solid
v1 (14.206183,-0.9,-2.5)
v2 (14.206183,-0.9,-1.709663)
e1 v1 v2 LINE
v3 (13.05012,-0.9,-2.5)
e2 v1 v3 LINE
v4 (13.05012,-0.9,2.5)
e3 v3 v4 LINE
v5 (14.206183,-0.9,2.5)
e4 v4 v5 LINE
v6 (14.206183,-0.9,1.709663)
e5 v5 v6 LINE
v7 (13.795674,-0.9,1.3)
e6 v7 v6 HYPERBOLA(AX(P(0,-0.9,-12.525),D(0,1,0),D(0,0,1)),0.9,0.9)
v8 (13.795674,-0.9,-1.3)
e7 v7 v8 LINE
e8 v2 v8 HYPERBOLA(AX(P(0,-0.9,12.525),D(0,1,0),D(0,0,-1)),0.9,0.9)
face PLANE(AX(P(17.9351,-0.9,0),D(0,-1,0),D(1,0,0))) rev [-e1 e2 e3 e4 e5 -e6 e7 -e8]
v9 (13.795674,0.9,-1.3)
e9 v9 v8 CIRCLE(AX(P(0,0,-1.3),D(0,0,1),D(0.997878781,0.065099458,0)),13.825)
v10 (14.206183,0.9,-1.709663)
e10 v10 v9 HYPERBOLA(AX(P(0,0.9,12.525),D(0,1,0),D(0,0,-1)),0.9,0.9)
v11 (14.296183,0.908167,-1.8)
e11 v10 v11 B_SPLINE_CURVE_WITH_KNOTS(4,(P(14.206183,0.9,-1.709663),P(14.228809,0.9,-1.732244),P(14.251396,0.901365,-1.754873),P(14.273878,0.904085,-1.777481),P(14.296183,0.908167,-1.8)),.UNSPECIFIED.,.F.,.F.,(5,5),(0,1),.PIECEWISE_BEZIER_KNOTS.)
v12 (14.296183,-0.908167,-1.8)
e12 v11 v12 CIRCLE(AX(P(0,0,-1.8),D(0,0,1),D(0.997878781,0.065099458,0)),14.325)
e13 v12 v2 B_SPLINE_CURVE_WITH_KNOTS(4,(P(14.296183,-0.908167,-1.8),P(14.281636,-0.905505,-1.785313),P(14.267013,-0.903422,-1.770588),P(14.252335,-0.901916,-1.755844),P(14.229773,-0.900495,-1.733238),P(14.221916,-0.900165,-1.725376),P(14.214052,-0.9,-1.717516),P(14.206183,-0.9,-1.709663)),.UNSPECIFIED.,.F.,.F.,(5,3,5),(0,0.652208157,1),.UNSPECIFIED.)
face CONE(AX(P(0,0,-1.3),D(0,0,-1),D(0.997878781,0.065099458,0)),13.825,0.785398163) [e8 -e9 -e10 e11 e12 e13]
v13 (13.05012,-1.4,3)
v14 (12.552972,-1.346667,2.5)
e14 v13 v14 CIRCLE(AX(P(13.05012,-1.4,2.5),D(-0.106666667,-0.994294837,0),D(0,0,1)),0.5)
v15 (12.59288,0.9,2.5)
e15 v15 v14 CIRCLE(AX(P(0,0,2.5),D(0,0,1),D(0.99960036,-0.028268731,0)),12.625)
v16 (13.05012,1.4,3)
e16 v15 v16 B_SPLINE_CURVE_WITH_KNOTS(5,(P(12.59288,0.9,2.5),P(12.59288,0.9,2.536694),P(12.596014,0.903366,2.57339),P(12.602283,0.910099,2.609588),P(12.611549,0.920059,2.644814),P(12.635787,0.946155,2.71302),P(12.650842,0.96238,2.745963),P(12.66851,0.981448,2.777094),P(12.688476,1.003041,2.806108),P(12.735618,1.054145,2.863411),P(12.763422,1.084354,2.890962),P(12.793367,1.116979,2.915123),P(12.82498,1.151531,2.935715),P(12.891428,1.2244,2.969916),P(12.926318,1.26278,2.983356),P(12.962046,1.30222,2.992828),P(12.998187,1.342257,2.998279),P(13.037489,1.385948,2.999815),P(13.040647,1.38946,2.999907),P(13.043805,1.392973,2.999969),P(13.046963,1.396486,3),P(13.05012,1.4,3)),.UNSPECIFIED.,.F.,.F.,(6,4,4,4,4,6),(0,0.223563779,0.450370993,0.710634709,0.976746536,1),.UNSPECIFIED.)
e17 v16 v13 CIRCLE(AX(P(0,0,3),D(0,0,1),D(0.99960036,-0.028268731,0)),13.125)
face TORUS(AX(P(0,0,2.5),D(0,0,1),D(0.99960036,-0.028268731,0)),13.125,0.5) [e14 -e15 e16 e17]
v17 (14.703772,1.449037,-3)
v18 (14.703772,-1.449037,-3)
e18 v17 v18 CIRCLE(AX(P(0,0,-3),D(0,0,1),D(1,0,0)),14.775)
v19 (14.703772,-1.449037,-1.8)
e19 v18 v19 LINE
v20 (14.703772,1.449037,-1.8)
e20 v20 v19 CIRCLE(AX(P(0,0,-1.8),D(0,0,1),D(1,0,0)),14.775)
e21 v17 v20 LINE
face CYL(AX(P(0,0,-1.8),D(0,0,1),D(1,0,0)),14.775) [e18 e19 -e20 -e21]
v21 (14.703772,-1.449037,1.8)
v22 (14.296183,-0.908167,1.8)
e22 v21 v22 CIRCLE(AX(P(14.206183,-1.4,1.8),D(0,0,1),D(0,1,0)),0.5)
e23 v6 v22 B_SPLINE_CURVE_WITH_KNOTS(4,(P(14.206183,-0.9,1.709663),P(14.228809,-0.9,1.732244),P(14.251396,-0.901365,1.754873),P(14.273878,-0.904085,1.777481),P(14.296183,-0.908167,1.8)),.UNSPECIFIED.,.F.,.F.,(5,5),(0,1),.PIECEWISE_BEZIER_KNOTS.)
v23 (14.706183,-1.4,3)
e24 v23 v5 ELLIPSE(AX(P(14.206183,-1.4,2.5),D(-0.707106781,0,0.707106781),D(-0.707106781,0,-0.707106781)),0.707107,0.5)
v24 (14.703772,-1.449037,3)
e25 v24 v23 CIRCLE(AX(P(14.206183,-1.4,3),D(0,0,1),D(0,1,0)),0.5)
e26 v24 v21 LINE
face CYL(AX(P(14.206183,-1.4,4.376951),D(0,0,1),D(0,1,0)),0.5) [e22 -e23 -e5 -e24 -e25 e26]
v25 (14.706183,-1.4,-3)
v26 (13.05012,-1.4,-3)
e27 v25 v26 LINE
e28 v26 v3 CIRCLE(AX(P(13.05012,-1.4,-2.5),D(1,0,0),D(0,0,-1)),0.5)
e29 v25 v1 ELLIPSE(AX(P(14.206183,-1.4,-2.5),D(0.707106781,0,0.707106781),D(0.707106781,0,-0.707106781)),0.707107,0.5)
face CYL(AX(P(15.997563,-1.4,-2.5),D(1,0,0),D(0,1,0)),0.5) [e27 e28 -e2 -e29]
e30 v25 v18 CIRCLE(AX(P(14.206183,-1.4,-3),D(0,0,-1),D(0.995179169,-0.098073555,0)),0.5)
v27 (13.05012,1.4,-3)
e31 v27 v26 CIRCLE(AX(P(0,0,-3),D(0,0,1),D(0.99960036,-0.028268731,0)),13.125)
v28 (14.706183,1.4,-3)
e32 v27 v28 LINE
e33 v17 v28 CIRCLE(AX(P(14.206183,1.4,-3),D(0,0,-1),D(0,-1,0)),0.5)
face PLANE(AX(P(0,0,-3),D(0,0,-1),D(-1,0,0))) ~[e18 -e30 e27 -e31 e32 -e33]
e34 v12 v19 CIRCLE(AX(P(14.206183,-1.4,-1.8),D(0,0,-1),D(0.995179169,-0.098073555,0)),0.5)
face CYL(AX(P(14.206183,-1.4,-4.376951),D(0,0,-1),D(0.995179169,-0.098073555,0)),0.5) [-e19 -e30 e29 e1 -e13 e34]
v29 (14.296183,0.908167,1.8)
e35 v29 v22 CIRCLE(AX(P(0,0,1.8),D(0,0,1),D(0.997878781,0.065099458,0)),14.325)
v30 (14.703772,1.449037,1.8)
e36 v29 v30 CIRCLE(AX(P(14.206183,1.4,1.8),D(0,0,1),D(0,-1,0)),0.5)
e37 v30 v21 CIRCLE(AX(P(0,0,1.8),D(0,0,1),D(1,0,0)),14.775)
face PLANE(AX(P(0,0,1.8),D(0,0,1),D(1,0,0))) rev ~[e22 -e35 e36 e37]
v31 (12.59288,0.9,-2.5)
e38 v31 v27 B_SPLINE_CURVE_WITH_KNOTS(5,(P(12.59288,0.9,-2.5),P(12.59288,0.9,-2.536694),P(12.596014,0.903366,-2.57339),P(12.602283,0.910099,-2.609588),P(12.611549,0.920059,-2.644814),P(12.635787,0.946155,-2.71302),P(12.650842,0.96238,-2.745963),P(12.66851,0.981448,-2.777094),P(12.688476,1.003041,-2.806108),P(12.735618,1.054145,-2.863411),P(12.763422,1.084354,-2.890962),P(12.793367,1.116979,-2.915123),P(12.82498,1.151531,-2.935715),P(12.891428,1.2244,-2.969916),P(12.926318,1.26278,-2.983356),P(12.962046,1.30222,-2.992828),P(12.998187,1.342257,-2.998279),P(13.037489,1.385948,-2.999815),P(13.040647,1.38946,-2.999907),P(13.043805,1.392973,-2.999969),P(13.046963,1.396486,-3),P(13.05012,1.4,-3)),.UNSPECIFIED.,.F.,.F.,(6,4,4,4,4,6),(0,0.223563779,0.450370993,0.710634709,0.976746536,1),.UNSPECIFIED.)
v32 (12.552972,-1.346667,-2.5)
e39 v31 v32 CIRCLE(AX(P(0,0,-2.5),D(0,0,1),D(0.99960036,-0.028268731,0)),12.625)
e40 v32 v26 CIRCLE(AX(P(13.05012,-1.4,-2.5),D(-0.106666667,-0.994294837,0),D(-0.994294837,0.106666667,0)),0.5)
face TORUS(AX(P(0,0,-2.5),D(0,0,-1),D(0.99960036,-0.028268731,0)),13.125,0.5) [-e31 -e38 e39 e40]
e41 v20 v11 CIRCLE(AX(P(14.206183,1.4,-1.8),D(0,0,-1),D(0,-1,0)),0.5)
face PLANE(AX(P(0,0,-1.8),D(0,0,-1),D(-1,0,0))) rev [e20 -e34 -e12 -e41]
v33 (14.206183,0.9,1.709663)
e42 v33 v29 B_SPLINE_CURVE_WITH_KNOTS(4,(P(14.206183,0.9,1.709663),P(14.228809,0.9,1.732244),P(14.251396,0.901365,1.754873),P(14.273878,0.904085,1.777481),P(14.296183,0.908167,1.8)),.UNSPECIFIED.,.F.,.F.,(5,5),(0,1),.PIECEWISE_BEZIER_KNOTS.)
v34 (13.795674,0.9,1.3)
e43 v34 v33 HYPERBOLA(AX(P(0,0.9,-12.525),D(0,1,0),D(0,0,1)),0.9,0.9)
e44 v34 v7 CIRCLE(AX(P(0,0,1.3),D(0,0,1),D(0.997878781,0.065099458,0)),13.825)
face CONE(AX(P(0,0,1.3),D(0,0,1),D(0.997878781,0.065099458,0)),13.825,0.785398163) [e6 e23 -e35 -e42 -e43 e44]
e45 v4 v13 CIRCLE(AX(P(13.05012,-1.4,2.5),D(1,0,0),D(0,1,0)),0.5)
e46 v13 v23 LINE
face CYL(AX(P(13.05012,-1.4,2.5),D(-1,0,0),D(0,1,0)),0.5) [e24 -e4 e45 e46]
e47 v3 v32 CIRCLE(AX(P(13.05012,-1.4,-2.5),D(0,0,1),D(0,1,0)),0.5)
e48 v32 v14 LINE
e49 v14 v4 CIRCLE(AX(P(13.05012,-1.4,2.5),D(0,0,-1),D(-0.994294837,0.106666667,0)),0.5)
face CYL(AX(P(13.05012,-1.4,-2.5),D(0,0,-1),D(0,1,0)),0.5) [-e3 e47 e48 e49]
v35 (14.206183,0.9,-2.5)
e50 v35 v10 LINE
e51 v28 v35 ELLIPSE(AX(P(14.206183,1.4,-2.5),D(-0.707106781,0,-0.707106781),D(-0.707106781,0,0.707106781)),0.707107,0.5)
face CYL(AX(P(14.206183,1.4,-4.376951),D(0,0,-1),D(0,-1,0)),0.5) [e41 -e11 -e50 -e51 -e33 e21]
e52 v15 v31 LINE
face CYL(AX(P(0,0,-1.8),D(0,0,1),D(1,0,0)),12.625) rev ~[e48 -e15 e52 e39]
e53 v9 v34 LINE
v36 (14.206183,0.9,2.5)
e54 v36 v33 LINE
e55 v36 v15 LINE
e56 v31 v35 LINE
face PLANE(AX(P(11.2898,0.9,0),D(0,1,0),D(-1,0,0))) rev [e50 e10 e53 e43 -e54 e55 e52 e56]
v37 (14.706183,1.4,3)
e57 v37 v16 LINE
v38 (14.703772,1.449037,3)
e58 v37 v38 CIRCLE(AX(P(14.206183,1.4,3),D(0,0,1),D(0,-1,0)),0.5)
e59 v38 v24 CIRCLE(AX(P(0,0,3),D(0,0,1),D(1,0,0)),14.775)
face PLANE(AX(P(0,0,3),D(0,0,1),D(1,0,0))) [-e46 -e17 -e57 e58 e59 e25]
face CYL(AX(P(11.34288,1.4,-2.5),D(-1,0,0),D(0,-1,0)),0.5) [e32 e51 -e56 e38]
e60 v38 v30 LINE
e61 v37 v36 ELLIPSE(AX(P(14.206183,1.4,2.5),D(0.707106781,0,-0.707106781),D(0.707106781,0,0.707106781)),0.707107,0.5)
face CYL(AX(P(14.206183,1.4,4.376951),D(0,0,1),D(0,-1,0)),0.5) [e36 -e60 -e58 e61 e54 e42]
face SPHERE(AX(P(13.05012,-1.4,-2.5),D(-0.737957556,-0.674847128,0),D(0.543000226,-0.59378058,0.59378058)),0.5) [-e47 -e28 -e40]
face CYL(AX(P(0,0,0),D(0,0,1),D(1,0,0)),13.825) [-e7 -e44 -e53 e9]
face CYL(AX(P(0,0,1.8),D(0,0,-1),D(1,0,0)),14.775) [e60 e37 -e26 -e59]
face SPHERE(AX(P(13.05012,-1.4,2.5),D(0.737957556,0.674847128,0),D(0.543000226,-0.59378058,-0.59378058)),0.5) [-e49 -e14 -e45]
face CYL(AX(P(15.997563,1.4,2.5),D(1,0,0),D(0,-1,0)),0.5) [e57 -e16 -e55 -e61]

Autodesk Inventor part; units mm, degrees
ref_plane "YZ Plane" through (0, 0, 0) normal (1, 0, 0) x (0, 1, 0)
ref_plane "XZ Plane" through (0, 0, 0) normal (0, 1, 0) x (-1, 0, 0)
ref_plane "XY Plane" through (0, 0, 0) normal (0, 0, 1) x (1, 0, 0)
sketch "Sketch1" plane through (0, 0, 0) normal (0, 0, 1) x (1, 0, 0)
  circle A0 centre (0, 0) radius 13.825
  circle A1 centre (0, 0) radius 12.625
  dimension "d0" = 27.65
  dimension "d1" = 25.25
extrude "Extrusion1" add sketch "Sketch1" along normal blind 1.8
sketch "Sketch2" plane through (0, 0, 1.8) normal (0, 0, 1) x (1, 0, 0)
  circle A0 centre (0, 0) radius 12.625
  circle A1 centre (0, 0) radius 14.775
  dimension "d5" = 29.55
  dimension "d16" = 25.25
extrude "Extrusion2" add sketch "Sketch2" along normal blind 1.2
sketch "Sketch3" plane through (0, 0, 0) normal (0, 0, 1) x (1, 0, 0)
  line L0 (11.2898, 0.9) -> (17.9351, 0.9)
  line L1 (17.9351, 0.9) -> (17.9351, -0.9)
  line L2 (17.9351, -0.9) -> (11.2898, -0.9)
  line L3 (11.2898, -0.9) -> (11.2898, 0.9)
  point P0 (0, 0)
  dimension "d13" = 1.8
  dimension "d14" = 6.6453
  dimension "d15" = 0.9
extrude "Extrusion3" cut sketch "Sketch3" along normal blind 6
chamfer "Chamfer1" distance 0.5 angle 45 1 edges at (-13.825, 0, 1.8)
mirror "Mirror2" about plane through (0, 0, 0) normal (0, 0, 1) of "Extrusion1", "Extrusion2", "Extrusion3", "Chamfer1"
fillet "Fillet1" radius 0.5 11 edges at (-12.625, 0, 3) (-12.625, 0, -3) (12.5929, -0.9, 0) (13.6702, -0.9, 3) (13.6702, -0.9, -3) (13.6702, 0.9, 3) (13.6702, 0.9, -3) (14.7476, 0.9, 2.4) (14.7476, 0.9, -2.4) (14.7476, -0.9, -2.4) (14.7476, -0.9, 2.4)
equation "\"d16\" = d1"
equation "\"d15\" = 0.5 * d13"
properties part number "maxtubingBoreWireProtectInsert"
